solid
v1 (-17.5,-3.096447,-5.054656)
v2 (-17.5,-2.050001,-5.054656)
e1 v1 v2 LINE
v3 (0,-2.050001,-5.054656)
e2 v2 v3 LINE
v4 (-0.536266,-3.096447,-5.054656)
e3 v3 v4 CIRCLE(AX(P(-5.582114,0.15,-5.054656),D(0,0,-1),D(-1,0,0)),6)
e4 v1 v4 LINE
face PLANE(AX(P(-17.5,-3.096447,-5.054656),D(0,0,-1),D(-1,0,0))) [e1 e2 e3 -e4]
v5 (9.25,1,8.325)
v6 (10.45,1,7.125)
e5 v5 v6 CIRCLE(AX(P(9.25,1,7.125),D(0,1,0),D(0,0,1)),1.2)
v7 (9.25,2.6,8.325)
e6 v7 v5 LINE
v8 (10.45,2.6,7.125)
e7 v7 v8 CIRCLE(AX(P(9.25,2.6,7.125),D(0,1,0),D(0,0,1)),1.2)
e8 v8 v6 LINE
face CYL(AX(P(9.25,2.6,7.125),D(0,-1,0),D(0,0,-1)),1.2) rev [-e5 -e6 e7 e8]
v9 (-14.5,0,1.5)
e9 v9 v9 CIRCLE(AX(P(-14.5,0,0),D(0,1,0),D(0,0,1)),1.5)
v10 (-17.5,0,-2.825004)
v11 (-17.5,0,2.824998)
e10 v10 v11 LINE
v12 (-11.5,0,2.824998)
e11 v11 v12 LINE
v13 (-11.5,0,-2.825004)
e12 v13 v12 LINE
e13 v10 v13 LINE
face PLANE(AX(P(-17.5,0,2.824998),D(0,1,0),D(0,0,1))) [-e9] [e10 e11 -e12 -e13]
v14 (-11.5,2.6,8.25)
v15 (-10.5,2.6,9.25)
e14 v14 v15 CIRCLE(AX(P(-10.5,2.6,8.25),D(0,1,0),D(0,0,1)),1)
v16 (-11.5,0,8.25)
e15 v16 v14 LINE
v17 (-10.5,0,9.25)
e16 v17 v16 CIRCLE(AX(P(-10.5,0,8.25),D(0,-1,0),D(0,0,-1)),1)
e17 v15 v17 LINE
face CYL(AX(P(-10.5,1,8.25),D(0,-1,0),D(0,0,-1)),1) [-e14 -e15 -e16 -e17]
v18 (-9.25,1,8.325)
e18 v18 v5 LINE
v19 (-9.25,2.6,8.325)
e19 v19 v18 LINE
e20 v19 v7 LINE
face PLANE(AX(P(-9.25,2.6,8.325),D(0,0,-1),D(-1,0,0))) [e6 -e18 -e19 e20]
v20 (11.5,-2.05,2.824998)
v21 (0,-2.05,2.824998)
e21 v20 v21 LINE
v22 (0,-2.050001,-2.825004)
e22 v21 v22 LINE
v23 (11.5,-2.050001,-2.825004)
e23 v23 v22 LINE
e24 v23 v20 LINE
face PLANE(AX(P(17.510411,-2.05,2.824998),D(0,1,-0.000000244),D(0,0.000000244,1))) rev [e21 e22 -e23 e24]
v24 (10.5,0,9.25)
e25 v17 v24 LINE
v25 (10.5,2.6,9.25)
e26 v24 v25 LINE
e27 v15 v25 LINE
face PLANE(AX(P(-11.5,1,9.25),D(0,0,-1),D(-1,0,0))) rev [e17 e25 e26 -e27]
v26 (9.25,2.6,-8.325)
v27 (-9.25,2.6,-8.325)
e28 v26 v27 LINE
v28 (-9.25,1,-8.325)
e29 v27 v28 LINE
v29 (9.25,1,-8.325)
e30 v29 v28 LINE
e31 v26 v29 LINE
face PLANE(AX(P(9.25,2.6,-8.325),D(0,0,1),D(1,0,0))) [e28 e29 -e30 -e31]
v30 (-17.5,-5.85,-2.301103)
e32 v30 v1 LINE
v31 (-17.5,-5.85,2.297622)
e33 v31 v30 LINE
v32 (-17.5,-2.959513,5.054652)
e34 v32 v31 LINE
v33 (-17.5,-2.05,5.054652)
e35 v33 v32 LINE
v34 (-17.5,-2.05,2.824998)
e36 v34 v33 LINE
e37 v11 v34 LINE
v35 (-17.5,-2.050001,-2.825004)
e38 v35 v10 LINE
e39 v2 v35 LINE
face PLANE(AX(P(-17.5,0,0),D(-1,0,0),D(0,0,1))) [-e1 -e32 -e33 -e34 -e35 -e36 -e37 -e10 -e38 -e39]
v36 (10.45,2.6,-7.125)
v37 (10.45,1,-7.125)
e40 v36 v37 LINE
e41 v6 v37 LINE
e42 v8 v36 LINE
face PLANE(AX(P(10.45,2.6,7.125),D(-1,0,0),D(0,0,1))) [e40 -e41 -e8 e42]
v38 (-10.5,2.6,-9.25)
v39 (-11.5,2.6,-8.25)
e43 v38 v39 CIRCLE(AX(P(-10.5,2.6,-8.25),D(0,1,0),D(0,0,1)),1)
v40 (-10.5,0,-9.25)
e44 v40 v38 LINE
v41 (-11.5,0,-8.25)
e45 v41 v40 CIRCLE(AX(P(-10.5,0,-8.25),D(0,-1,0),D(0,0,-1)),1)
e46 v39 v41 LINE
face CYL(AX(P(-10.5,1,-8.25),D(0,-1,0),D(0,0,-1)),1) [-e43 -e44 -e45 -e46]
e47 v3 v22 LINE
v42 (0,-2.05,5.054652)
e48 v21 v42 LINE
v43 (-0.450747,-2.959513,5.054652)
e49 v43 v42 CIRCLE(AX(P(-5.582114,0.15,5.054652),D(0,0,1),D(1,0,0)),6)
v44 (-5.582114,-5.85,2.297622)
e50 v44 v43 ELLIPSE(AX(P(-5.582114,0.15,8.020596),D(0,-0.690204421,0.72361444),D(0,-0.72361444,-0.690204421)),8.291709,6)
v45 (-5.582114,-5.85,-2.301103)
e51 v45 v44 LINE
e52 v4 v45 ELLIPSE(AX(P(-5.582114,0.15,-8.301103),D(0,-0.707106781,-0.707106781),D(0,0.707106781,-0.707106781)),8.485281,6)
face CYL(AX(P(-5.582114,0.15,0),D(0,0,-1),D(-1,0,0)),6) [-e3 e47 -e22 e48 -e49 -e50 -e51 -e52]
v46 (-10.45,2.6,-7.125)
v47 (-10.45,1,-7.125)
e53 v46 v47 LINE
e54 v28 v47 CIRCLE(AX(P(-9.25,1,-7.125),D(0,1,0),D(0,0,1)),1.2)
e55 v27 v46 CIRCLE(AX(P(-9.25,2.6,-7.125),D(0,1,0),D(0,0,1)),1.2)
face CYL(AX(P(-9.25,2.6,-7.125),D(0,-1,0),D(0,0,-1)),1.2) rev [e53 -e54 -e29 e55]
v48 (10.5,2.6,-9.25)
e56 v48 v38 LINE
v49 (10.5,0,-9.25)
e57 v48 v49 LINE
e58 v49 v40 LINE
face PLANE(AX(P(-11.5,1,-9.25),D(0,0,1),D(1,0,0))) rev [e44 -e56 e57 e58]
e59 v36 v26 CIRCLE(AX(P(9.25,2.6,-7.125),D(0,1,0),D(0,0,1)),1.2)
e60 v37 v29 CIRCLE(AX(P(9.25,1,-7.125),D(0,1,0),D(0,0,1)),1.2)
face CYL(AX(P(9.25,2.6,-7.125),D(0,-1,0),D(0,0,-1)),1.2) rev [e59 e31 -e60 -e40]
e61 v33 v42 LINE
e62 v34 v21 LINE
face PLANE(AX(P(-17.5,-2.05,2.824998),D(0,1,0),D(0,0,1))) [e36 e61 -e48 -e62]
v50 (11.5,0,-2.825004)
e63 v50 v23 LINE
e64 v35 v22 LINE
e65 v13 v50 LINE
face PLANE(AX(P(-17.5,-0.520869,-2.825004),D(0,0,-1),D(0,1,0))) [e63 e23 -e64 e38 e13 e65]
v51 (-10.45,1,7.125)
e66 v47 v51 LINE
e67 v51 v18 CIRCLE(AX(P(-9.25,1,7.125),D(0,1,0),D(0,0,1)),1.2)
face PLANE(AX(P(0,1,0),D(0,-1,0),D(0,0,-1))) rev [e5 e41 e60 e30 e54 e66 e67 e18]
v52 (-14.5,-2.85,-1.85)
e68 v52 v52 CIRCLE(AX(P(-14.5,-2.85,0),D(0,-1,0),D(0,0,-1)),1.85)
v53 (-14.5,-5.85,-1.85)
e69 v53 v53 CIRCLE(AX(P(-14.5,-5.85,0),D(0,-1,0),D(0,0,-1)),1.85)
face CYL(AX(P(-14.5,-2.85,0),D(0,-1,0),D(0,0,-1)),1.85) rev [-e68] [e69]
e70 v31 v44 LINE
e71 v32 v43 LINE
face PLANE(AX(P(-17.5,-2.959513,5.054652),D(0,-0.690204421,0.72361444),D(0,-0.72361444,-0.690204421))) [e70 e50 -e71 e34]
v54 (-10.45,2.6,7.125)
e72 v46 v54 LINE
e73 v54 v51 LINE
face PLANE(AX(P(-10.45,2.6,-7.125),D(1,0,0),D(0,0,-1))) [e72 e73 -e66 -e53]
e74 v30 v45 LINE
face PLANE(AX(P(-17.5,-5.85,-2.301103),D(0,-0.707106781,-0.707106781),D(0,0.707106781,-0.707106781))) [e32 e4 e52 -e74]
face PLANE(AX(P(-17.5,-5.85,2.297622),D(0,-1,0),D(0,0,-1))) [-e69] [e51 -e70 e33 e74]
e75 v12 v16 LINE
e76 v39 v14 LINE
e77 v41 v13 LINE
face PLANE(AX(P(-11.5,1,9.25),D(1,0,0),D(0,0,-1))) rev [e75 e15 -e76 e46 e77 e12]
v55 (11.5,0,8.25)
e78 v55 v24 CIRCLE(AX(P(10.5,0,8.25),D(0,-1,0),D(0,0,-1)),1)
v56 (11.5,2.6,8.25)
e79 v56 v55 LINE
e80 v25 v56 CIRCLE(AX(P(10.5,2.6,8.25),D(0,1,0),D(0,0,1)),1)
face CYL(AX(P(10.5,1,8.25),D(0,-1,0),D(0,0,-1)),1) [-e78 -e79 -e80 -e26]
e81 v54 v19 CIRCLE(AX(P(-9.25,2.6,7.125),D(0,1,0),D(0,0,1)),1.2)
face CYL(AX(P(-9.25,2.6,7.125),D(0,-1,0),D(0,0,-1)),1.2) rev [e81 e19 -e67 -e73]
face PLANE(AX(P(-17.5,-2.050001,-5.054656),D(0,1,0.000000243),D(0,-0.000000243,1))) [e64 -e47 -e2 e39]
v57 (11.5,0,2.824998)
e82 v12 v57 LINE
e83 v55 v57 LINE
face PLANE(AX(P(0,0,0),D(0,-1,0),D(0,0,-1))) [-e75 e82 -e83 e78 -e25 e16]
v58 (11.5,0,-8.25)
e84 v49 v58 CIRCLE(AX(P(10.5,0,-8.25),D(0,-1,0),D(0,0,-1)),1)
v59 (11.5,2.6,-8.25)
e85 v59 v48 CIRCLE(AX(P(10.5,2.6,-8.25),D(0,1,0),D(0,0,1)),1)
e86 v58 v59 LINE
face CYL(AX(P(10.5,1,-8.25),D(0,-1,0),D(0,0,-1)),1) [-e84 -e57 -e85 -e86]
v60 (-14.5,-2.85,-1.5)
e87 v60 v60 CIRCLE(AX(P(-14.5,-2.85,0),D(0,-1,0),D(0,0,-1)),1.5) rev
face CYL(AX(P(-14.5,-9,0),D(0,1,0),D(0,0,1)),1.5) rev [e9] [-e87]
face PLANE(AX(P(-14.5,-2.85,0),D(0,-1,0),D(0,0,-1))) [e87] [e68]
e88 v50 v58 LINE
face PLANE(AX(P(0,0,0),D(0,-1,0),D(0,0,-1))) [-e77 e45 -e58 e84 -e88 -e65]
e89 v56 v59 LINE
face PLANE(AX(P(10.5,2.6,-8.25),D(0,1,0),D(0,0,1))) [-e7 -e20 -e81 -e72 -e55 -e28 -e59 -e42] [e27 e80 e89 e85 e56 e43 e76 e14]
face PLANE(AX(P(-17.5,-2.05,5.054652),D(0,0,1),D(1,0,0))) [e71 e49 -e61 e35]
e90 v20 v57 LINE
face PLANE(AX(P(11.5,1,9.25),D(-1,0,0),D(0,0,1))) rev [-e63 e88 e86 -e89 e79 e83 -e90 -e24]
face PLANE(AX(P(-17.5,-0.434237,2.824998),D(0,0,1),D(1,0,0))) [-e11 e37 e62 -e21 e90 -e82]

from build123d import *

# Parameters (mm, degrees)
SKETCH1_W           = 23
SKETCH1_H           = 18.5
BOSS_EXTRUDE1_DEPTH = 1
FILLET1_R           = 1
BOSS_EXTRUDE2_START = 1.6
BOSS_EXTRUDE2_DEPTH = 1.6
BOSS_EXTRUDE3_DEPTH = 17.5
BOSS_EXTRUDE4_DEPTH = 11.5
FILLET2_R           = 6
SKETCH5_R           = 1.5
CUT_EXTRUDE1_DEPTH  = 9
SKETCH6_R           = 1.85
CUT_EXTRUDE3_DEPTH  = 3


with BuildPart() as part:
    # Sketch1 → Boss-Extrude1 (new body)
    with BuildSketch(Plane(origin=(0, 0, 0), x_dir=(1, 0, 0), z_dir=(0, 1, 0))):
        Rectangle(SKETCH1_W, SKETCH1_H)
    extrude(amount=BOSS_EXTRUDE1_DEPTH)

    # Fillet1
    fillet1_edges = [part.edges().sort_by_distance(p)[0] for p in [
        (11.5, 0.5, 9.25),
        (-11.5, 0.5, 9.25),
        (-11.5, 0.5, -9.25),
        (11.5, 0.5, -9.25),
    ]]
    fillet(fillet1_edges, radius=FILLET1_R)

    # Sketch2 → Boss-Extrude2 (add)
    with BuildSketch(Plane(origin=(0, 1, 0), x_dir=(1, 0, 0), z_dir=(0, 1, 0)).offset(BOSS_EXTRUDE2_START)):
        with BuildLine():
            Line((10.5, 9.25), (-10.5, 9.25))
            ThreePointArc((-10.5, 9.25), (-11.207106781, 8.957106781), (-11.5, 8.25))
            Line((-11.5, 8.25), (-11.5, -8.25))
            ThreePointArc((-11.5, -8.25), (-11.207106781, -8.957106781), (-10.5, -9.25))
            Line((-10.5, -9.25), (10.5, -9.25))
            ThreePointArc((10.5, -9.25), (11.207106781, -8.957106781), (11.5, -8.25))
            Line((11.5, -8.25), (11.5, 8.25))
            ThreePointArc((11.5, 8.25), (11.207106781, 8.957106781), (10.5, 9.25))
        make_face()
        with BuildLine():
            Line((9.25, 8.325), (-9.25, 8.325))
            ThreePointArc((-9.25, 8.325), (-10.098528137, 7.973528137), (-10.45, 7.125))
            Line((-10.45, 7.125), (-10.45, -7.125))
            ThreePointArc((-10.45, -7.125), (-10.098528137, -7.973528137), (-9.25, -8.325))
            Line((-9.25, -8.325), (9.25, -8.325))
            ThreePointArc((9.25, -8.325), (10.098528137, -7.973528137), (10.45, -7.125))
            Line((10.45, -7.125), (10.45, 7.125))
            ThreePointArc((10.45, 7.125), (10.098528137, 7.973528137), (9.25, 8.325))
        make_face(mode=Mode.SUBTRACT)
    extrude(amount=-BOSS_EXTRUDE2_DEPTH)

    # Sketch3 → Boss-Extrude3 (add)
    with BuildSketch(Plane(origin=(0, 0, 0), x_dir=(0, 0, -1), z_dir=(1, 0, 0))):
        Polygon((-2.824998215, -0.434236645), (-2.824998215, 0), (2.825004114, 0), (2.825004114, -0.52086856), (2.825004485, -2.050001378), (5.054655907, -2.050000837), (5.054655907, -3.096446609), (2.301102516, -5.85), (-2.297621726, -5.85), (-5.054652336, -2.959512633), (-5.054652336, -2.05), (-2.824998215, -2.05), align=None)
    extrude(amount=-BOSS_EXTRUDE3_DEPTH)

    # Sketch4 → Boss-Extrude4 (add)
    with BuildSketch(Plane(origin=(0, 0, 0), x_dir=(0, 0, -1), z_dir=(1, 0, 0))):
        Polygon((-2.824998215, -2.05), (2.825004485, -2.050001378), (2.825004114, 0), (-2.824998215, 0), align=None)
    extrude(amount=BOSS_EXTRUDE4_DEPTH)

    # Fillet2
    # the kernel refuses this fillet: 6 mm, written as the material it takes off along each edge
    with BuildSketch(Plane(origin=(0, -5.85, -16.256387574), x_dir=(0, 1, 0), z_dir=(0, 0, 1))) as fillet2_piece_1:
        with BuildLine():
            CenterArc((6, 5.582114023), FILLET2_R, 180, 68.489804657)
            Line((0, 5.582114023), (-0.12, 5.582114023))
            Line((-0.12, 5.582114023), (-0.12, 0))
            Line((-0.12, 0), (0, -0.12))
            ThreePointArc((0, -0.12), (1.899999655, -0.12), (3.755999297, -0.11164228))
            Line((3.755999297, -0.11164228), (3.799999311, 0))
        make_face()
    extrude(amount=32.509294358, mode=Mode.SUBTRACT)

    # Sketch5 → Cut-Extrude1 (cut)
    with BuildSketch(Plane(origin=(0, 0, 0), x_dir=(1, 0, 0), z_dir=(0, 1, 0))):
        with Locations(Location((-14.5, 0, 0), (0, 0, 270))):
            Circle(SKETCH5_R)
    extrude(amount=-CUT_EXTRUDE1_DEPTH, mode=Mode.SUBTRACT)

    # Sketch6 → Cut-Extrude3 (cut)
    with BuildSketch(Plane.XZ.offset(5.85)):
        with Locations(Location((-14.5, 0, 0), (0, 0, 270))):
            Circle(SKETCH6_R)
    extrude(amount=-CUT_EXTRUDE3_DEPTH, mode=Mode.SUBTRACT)


solid = part.part
